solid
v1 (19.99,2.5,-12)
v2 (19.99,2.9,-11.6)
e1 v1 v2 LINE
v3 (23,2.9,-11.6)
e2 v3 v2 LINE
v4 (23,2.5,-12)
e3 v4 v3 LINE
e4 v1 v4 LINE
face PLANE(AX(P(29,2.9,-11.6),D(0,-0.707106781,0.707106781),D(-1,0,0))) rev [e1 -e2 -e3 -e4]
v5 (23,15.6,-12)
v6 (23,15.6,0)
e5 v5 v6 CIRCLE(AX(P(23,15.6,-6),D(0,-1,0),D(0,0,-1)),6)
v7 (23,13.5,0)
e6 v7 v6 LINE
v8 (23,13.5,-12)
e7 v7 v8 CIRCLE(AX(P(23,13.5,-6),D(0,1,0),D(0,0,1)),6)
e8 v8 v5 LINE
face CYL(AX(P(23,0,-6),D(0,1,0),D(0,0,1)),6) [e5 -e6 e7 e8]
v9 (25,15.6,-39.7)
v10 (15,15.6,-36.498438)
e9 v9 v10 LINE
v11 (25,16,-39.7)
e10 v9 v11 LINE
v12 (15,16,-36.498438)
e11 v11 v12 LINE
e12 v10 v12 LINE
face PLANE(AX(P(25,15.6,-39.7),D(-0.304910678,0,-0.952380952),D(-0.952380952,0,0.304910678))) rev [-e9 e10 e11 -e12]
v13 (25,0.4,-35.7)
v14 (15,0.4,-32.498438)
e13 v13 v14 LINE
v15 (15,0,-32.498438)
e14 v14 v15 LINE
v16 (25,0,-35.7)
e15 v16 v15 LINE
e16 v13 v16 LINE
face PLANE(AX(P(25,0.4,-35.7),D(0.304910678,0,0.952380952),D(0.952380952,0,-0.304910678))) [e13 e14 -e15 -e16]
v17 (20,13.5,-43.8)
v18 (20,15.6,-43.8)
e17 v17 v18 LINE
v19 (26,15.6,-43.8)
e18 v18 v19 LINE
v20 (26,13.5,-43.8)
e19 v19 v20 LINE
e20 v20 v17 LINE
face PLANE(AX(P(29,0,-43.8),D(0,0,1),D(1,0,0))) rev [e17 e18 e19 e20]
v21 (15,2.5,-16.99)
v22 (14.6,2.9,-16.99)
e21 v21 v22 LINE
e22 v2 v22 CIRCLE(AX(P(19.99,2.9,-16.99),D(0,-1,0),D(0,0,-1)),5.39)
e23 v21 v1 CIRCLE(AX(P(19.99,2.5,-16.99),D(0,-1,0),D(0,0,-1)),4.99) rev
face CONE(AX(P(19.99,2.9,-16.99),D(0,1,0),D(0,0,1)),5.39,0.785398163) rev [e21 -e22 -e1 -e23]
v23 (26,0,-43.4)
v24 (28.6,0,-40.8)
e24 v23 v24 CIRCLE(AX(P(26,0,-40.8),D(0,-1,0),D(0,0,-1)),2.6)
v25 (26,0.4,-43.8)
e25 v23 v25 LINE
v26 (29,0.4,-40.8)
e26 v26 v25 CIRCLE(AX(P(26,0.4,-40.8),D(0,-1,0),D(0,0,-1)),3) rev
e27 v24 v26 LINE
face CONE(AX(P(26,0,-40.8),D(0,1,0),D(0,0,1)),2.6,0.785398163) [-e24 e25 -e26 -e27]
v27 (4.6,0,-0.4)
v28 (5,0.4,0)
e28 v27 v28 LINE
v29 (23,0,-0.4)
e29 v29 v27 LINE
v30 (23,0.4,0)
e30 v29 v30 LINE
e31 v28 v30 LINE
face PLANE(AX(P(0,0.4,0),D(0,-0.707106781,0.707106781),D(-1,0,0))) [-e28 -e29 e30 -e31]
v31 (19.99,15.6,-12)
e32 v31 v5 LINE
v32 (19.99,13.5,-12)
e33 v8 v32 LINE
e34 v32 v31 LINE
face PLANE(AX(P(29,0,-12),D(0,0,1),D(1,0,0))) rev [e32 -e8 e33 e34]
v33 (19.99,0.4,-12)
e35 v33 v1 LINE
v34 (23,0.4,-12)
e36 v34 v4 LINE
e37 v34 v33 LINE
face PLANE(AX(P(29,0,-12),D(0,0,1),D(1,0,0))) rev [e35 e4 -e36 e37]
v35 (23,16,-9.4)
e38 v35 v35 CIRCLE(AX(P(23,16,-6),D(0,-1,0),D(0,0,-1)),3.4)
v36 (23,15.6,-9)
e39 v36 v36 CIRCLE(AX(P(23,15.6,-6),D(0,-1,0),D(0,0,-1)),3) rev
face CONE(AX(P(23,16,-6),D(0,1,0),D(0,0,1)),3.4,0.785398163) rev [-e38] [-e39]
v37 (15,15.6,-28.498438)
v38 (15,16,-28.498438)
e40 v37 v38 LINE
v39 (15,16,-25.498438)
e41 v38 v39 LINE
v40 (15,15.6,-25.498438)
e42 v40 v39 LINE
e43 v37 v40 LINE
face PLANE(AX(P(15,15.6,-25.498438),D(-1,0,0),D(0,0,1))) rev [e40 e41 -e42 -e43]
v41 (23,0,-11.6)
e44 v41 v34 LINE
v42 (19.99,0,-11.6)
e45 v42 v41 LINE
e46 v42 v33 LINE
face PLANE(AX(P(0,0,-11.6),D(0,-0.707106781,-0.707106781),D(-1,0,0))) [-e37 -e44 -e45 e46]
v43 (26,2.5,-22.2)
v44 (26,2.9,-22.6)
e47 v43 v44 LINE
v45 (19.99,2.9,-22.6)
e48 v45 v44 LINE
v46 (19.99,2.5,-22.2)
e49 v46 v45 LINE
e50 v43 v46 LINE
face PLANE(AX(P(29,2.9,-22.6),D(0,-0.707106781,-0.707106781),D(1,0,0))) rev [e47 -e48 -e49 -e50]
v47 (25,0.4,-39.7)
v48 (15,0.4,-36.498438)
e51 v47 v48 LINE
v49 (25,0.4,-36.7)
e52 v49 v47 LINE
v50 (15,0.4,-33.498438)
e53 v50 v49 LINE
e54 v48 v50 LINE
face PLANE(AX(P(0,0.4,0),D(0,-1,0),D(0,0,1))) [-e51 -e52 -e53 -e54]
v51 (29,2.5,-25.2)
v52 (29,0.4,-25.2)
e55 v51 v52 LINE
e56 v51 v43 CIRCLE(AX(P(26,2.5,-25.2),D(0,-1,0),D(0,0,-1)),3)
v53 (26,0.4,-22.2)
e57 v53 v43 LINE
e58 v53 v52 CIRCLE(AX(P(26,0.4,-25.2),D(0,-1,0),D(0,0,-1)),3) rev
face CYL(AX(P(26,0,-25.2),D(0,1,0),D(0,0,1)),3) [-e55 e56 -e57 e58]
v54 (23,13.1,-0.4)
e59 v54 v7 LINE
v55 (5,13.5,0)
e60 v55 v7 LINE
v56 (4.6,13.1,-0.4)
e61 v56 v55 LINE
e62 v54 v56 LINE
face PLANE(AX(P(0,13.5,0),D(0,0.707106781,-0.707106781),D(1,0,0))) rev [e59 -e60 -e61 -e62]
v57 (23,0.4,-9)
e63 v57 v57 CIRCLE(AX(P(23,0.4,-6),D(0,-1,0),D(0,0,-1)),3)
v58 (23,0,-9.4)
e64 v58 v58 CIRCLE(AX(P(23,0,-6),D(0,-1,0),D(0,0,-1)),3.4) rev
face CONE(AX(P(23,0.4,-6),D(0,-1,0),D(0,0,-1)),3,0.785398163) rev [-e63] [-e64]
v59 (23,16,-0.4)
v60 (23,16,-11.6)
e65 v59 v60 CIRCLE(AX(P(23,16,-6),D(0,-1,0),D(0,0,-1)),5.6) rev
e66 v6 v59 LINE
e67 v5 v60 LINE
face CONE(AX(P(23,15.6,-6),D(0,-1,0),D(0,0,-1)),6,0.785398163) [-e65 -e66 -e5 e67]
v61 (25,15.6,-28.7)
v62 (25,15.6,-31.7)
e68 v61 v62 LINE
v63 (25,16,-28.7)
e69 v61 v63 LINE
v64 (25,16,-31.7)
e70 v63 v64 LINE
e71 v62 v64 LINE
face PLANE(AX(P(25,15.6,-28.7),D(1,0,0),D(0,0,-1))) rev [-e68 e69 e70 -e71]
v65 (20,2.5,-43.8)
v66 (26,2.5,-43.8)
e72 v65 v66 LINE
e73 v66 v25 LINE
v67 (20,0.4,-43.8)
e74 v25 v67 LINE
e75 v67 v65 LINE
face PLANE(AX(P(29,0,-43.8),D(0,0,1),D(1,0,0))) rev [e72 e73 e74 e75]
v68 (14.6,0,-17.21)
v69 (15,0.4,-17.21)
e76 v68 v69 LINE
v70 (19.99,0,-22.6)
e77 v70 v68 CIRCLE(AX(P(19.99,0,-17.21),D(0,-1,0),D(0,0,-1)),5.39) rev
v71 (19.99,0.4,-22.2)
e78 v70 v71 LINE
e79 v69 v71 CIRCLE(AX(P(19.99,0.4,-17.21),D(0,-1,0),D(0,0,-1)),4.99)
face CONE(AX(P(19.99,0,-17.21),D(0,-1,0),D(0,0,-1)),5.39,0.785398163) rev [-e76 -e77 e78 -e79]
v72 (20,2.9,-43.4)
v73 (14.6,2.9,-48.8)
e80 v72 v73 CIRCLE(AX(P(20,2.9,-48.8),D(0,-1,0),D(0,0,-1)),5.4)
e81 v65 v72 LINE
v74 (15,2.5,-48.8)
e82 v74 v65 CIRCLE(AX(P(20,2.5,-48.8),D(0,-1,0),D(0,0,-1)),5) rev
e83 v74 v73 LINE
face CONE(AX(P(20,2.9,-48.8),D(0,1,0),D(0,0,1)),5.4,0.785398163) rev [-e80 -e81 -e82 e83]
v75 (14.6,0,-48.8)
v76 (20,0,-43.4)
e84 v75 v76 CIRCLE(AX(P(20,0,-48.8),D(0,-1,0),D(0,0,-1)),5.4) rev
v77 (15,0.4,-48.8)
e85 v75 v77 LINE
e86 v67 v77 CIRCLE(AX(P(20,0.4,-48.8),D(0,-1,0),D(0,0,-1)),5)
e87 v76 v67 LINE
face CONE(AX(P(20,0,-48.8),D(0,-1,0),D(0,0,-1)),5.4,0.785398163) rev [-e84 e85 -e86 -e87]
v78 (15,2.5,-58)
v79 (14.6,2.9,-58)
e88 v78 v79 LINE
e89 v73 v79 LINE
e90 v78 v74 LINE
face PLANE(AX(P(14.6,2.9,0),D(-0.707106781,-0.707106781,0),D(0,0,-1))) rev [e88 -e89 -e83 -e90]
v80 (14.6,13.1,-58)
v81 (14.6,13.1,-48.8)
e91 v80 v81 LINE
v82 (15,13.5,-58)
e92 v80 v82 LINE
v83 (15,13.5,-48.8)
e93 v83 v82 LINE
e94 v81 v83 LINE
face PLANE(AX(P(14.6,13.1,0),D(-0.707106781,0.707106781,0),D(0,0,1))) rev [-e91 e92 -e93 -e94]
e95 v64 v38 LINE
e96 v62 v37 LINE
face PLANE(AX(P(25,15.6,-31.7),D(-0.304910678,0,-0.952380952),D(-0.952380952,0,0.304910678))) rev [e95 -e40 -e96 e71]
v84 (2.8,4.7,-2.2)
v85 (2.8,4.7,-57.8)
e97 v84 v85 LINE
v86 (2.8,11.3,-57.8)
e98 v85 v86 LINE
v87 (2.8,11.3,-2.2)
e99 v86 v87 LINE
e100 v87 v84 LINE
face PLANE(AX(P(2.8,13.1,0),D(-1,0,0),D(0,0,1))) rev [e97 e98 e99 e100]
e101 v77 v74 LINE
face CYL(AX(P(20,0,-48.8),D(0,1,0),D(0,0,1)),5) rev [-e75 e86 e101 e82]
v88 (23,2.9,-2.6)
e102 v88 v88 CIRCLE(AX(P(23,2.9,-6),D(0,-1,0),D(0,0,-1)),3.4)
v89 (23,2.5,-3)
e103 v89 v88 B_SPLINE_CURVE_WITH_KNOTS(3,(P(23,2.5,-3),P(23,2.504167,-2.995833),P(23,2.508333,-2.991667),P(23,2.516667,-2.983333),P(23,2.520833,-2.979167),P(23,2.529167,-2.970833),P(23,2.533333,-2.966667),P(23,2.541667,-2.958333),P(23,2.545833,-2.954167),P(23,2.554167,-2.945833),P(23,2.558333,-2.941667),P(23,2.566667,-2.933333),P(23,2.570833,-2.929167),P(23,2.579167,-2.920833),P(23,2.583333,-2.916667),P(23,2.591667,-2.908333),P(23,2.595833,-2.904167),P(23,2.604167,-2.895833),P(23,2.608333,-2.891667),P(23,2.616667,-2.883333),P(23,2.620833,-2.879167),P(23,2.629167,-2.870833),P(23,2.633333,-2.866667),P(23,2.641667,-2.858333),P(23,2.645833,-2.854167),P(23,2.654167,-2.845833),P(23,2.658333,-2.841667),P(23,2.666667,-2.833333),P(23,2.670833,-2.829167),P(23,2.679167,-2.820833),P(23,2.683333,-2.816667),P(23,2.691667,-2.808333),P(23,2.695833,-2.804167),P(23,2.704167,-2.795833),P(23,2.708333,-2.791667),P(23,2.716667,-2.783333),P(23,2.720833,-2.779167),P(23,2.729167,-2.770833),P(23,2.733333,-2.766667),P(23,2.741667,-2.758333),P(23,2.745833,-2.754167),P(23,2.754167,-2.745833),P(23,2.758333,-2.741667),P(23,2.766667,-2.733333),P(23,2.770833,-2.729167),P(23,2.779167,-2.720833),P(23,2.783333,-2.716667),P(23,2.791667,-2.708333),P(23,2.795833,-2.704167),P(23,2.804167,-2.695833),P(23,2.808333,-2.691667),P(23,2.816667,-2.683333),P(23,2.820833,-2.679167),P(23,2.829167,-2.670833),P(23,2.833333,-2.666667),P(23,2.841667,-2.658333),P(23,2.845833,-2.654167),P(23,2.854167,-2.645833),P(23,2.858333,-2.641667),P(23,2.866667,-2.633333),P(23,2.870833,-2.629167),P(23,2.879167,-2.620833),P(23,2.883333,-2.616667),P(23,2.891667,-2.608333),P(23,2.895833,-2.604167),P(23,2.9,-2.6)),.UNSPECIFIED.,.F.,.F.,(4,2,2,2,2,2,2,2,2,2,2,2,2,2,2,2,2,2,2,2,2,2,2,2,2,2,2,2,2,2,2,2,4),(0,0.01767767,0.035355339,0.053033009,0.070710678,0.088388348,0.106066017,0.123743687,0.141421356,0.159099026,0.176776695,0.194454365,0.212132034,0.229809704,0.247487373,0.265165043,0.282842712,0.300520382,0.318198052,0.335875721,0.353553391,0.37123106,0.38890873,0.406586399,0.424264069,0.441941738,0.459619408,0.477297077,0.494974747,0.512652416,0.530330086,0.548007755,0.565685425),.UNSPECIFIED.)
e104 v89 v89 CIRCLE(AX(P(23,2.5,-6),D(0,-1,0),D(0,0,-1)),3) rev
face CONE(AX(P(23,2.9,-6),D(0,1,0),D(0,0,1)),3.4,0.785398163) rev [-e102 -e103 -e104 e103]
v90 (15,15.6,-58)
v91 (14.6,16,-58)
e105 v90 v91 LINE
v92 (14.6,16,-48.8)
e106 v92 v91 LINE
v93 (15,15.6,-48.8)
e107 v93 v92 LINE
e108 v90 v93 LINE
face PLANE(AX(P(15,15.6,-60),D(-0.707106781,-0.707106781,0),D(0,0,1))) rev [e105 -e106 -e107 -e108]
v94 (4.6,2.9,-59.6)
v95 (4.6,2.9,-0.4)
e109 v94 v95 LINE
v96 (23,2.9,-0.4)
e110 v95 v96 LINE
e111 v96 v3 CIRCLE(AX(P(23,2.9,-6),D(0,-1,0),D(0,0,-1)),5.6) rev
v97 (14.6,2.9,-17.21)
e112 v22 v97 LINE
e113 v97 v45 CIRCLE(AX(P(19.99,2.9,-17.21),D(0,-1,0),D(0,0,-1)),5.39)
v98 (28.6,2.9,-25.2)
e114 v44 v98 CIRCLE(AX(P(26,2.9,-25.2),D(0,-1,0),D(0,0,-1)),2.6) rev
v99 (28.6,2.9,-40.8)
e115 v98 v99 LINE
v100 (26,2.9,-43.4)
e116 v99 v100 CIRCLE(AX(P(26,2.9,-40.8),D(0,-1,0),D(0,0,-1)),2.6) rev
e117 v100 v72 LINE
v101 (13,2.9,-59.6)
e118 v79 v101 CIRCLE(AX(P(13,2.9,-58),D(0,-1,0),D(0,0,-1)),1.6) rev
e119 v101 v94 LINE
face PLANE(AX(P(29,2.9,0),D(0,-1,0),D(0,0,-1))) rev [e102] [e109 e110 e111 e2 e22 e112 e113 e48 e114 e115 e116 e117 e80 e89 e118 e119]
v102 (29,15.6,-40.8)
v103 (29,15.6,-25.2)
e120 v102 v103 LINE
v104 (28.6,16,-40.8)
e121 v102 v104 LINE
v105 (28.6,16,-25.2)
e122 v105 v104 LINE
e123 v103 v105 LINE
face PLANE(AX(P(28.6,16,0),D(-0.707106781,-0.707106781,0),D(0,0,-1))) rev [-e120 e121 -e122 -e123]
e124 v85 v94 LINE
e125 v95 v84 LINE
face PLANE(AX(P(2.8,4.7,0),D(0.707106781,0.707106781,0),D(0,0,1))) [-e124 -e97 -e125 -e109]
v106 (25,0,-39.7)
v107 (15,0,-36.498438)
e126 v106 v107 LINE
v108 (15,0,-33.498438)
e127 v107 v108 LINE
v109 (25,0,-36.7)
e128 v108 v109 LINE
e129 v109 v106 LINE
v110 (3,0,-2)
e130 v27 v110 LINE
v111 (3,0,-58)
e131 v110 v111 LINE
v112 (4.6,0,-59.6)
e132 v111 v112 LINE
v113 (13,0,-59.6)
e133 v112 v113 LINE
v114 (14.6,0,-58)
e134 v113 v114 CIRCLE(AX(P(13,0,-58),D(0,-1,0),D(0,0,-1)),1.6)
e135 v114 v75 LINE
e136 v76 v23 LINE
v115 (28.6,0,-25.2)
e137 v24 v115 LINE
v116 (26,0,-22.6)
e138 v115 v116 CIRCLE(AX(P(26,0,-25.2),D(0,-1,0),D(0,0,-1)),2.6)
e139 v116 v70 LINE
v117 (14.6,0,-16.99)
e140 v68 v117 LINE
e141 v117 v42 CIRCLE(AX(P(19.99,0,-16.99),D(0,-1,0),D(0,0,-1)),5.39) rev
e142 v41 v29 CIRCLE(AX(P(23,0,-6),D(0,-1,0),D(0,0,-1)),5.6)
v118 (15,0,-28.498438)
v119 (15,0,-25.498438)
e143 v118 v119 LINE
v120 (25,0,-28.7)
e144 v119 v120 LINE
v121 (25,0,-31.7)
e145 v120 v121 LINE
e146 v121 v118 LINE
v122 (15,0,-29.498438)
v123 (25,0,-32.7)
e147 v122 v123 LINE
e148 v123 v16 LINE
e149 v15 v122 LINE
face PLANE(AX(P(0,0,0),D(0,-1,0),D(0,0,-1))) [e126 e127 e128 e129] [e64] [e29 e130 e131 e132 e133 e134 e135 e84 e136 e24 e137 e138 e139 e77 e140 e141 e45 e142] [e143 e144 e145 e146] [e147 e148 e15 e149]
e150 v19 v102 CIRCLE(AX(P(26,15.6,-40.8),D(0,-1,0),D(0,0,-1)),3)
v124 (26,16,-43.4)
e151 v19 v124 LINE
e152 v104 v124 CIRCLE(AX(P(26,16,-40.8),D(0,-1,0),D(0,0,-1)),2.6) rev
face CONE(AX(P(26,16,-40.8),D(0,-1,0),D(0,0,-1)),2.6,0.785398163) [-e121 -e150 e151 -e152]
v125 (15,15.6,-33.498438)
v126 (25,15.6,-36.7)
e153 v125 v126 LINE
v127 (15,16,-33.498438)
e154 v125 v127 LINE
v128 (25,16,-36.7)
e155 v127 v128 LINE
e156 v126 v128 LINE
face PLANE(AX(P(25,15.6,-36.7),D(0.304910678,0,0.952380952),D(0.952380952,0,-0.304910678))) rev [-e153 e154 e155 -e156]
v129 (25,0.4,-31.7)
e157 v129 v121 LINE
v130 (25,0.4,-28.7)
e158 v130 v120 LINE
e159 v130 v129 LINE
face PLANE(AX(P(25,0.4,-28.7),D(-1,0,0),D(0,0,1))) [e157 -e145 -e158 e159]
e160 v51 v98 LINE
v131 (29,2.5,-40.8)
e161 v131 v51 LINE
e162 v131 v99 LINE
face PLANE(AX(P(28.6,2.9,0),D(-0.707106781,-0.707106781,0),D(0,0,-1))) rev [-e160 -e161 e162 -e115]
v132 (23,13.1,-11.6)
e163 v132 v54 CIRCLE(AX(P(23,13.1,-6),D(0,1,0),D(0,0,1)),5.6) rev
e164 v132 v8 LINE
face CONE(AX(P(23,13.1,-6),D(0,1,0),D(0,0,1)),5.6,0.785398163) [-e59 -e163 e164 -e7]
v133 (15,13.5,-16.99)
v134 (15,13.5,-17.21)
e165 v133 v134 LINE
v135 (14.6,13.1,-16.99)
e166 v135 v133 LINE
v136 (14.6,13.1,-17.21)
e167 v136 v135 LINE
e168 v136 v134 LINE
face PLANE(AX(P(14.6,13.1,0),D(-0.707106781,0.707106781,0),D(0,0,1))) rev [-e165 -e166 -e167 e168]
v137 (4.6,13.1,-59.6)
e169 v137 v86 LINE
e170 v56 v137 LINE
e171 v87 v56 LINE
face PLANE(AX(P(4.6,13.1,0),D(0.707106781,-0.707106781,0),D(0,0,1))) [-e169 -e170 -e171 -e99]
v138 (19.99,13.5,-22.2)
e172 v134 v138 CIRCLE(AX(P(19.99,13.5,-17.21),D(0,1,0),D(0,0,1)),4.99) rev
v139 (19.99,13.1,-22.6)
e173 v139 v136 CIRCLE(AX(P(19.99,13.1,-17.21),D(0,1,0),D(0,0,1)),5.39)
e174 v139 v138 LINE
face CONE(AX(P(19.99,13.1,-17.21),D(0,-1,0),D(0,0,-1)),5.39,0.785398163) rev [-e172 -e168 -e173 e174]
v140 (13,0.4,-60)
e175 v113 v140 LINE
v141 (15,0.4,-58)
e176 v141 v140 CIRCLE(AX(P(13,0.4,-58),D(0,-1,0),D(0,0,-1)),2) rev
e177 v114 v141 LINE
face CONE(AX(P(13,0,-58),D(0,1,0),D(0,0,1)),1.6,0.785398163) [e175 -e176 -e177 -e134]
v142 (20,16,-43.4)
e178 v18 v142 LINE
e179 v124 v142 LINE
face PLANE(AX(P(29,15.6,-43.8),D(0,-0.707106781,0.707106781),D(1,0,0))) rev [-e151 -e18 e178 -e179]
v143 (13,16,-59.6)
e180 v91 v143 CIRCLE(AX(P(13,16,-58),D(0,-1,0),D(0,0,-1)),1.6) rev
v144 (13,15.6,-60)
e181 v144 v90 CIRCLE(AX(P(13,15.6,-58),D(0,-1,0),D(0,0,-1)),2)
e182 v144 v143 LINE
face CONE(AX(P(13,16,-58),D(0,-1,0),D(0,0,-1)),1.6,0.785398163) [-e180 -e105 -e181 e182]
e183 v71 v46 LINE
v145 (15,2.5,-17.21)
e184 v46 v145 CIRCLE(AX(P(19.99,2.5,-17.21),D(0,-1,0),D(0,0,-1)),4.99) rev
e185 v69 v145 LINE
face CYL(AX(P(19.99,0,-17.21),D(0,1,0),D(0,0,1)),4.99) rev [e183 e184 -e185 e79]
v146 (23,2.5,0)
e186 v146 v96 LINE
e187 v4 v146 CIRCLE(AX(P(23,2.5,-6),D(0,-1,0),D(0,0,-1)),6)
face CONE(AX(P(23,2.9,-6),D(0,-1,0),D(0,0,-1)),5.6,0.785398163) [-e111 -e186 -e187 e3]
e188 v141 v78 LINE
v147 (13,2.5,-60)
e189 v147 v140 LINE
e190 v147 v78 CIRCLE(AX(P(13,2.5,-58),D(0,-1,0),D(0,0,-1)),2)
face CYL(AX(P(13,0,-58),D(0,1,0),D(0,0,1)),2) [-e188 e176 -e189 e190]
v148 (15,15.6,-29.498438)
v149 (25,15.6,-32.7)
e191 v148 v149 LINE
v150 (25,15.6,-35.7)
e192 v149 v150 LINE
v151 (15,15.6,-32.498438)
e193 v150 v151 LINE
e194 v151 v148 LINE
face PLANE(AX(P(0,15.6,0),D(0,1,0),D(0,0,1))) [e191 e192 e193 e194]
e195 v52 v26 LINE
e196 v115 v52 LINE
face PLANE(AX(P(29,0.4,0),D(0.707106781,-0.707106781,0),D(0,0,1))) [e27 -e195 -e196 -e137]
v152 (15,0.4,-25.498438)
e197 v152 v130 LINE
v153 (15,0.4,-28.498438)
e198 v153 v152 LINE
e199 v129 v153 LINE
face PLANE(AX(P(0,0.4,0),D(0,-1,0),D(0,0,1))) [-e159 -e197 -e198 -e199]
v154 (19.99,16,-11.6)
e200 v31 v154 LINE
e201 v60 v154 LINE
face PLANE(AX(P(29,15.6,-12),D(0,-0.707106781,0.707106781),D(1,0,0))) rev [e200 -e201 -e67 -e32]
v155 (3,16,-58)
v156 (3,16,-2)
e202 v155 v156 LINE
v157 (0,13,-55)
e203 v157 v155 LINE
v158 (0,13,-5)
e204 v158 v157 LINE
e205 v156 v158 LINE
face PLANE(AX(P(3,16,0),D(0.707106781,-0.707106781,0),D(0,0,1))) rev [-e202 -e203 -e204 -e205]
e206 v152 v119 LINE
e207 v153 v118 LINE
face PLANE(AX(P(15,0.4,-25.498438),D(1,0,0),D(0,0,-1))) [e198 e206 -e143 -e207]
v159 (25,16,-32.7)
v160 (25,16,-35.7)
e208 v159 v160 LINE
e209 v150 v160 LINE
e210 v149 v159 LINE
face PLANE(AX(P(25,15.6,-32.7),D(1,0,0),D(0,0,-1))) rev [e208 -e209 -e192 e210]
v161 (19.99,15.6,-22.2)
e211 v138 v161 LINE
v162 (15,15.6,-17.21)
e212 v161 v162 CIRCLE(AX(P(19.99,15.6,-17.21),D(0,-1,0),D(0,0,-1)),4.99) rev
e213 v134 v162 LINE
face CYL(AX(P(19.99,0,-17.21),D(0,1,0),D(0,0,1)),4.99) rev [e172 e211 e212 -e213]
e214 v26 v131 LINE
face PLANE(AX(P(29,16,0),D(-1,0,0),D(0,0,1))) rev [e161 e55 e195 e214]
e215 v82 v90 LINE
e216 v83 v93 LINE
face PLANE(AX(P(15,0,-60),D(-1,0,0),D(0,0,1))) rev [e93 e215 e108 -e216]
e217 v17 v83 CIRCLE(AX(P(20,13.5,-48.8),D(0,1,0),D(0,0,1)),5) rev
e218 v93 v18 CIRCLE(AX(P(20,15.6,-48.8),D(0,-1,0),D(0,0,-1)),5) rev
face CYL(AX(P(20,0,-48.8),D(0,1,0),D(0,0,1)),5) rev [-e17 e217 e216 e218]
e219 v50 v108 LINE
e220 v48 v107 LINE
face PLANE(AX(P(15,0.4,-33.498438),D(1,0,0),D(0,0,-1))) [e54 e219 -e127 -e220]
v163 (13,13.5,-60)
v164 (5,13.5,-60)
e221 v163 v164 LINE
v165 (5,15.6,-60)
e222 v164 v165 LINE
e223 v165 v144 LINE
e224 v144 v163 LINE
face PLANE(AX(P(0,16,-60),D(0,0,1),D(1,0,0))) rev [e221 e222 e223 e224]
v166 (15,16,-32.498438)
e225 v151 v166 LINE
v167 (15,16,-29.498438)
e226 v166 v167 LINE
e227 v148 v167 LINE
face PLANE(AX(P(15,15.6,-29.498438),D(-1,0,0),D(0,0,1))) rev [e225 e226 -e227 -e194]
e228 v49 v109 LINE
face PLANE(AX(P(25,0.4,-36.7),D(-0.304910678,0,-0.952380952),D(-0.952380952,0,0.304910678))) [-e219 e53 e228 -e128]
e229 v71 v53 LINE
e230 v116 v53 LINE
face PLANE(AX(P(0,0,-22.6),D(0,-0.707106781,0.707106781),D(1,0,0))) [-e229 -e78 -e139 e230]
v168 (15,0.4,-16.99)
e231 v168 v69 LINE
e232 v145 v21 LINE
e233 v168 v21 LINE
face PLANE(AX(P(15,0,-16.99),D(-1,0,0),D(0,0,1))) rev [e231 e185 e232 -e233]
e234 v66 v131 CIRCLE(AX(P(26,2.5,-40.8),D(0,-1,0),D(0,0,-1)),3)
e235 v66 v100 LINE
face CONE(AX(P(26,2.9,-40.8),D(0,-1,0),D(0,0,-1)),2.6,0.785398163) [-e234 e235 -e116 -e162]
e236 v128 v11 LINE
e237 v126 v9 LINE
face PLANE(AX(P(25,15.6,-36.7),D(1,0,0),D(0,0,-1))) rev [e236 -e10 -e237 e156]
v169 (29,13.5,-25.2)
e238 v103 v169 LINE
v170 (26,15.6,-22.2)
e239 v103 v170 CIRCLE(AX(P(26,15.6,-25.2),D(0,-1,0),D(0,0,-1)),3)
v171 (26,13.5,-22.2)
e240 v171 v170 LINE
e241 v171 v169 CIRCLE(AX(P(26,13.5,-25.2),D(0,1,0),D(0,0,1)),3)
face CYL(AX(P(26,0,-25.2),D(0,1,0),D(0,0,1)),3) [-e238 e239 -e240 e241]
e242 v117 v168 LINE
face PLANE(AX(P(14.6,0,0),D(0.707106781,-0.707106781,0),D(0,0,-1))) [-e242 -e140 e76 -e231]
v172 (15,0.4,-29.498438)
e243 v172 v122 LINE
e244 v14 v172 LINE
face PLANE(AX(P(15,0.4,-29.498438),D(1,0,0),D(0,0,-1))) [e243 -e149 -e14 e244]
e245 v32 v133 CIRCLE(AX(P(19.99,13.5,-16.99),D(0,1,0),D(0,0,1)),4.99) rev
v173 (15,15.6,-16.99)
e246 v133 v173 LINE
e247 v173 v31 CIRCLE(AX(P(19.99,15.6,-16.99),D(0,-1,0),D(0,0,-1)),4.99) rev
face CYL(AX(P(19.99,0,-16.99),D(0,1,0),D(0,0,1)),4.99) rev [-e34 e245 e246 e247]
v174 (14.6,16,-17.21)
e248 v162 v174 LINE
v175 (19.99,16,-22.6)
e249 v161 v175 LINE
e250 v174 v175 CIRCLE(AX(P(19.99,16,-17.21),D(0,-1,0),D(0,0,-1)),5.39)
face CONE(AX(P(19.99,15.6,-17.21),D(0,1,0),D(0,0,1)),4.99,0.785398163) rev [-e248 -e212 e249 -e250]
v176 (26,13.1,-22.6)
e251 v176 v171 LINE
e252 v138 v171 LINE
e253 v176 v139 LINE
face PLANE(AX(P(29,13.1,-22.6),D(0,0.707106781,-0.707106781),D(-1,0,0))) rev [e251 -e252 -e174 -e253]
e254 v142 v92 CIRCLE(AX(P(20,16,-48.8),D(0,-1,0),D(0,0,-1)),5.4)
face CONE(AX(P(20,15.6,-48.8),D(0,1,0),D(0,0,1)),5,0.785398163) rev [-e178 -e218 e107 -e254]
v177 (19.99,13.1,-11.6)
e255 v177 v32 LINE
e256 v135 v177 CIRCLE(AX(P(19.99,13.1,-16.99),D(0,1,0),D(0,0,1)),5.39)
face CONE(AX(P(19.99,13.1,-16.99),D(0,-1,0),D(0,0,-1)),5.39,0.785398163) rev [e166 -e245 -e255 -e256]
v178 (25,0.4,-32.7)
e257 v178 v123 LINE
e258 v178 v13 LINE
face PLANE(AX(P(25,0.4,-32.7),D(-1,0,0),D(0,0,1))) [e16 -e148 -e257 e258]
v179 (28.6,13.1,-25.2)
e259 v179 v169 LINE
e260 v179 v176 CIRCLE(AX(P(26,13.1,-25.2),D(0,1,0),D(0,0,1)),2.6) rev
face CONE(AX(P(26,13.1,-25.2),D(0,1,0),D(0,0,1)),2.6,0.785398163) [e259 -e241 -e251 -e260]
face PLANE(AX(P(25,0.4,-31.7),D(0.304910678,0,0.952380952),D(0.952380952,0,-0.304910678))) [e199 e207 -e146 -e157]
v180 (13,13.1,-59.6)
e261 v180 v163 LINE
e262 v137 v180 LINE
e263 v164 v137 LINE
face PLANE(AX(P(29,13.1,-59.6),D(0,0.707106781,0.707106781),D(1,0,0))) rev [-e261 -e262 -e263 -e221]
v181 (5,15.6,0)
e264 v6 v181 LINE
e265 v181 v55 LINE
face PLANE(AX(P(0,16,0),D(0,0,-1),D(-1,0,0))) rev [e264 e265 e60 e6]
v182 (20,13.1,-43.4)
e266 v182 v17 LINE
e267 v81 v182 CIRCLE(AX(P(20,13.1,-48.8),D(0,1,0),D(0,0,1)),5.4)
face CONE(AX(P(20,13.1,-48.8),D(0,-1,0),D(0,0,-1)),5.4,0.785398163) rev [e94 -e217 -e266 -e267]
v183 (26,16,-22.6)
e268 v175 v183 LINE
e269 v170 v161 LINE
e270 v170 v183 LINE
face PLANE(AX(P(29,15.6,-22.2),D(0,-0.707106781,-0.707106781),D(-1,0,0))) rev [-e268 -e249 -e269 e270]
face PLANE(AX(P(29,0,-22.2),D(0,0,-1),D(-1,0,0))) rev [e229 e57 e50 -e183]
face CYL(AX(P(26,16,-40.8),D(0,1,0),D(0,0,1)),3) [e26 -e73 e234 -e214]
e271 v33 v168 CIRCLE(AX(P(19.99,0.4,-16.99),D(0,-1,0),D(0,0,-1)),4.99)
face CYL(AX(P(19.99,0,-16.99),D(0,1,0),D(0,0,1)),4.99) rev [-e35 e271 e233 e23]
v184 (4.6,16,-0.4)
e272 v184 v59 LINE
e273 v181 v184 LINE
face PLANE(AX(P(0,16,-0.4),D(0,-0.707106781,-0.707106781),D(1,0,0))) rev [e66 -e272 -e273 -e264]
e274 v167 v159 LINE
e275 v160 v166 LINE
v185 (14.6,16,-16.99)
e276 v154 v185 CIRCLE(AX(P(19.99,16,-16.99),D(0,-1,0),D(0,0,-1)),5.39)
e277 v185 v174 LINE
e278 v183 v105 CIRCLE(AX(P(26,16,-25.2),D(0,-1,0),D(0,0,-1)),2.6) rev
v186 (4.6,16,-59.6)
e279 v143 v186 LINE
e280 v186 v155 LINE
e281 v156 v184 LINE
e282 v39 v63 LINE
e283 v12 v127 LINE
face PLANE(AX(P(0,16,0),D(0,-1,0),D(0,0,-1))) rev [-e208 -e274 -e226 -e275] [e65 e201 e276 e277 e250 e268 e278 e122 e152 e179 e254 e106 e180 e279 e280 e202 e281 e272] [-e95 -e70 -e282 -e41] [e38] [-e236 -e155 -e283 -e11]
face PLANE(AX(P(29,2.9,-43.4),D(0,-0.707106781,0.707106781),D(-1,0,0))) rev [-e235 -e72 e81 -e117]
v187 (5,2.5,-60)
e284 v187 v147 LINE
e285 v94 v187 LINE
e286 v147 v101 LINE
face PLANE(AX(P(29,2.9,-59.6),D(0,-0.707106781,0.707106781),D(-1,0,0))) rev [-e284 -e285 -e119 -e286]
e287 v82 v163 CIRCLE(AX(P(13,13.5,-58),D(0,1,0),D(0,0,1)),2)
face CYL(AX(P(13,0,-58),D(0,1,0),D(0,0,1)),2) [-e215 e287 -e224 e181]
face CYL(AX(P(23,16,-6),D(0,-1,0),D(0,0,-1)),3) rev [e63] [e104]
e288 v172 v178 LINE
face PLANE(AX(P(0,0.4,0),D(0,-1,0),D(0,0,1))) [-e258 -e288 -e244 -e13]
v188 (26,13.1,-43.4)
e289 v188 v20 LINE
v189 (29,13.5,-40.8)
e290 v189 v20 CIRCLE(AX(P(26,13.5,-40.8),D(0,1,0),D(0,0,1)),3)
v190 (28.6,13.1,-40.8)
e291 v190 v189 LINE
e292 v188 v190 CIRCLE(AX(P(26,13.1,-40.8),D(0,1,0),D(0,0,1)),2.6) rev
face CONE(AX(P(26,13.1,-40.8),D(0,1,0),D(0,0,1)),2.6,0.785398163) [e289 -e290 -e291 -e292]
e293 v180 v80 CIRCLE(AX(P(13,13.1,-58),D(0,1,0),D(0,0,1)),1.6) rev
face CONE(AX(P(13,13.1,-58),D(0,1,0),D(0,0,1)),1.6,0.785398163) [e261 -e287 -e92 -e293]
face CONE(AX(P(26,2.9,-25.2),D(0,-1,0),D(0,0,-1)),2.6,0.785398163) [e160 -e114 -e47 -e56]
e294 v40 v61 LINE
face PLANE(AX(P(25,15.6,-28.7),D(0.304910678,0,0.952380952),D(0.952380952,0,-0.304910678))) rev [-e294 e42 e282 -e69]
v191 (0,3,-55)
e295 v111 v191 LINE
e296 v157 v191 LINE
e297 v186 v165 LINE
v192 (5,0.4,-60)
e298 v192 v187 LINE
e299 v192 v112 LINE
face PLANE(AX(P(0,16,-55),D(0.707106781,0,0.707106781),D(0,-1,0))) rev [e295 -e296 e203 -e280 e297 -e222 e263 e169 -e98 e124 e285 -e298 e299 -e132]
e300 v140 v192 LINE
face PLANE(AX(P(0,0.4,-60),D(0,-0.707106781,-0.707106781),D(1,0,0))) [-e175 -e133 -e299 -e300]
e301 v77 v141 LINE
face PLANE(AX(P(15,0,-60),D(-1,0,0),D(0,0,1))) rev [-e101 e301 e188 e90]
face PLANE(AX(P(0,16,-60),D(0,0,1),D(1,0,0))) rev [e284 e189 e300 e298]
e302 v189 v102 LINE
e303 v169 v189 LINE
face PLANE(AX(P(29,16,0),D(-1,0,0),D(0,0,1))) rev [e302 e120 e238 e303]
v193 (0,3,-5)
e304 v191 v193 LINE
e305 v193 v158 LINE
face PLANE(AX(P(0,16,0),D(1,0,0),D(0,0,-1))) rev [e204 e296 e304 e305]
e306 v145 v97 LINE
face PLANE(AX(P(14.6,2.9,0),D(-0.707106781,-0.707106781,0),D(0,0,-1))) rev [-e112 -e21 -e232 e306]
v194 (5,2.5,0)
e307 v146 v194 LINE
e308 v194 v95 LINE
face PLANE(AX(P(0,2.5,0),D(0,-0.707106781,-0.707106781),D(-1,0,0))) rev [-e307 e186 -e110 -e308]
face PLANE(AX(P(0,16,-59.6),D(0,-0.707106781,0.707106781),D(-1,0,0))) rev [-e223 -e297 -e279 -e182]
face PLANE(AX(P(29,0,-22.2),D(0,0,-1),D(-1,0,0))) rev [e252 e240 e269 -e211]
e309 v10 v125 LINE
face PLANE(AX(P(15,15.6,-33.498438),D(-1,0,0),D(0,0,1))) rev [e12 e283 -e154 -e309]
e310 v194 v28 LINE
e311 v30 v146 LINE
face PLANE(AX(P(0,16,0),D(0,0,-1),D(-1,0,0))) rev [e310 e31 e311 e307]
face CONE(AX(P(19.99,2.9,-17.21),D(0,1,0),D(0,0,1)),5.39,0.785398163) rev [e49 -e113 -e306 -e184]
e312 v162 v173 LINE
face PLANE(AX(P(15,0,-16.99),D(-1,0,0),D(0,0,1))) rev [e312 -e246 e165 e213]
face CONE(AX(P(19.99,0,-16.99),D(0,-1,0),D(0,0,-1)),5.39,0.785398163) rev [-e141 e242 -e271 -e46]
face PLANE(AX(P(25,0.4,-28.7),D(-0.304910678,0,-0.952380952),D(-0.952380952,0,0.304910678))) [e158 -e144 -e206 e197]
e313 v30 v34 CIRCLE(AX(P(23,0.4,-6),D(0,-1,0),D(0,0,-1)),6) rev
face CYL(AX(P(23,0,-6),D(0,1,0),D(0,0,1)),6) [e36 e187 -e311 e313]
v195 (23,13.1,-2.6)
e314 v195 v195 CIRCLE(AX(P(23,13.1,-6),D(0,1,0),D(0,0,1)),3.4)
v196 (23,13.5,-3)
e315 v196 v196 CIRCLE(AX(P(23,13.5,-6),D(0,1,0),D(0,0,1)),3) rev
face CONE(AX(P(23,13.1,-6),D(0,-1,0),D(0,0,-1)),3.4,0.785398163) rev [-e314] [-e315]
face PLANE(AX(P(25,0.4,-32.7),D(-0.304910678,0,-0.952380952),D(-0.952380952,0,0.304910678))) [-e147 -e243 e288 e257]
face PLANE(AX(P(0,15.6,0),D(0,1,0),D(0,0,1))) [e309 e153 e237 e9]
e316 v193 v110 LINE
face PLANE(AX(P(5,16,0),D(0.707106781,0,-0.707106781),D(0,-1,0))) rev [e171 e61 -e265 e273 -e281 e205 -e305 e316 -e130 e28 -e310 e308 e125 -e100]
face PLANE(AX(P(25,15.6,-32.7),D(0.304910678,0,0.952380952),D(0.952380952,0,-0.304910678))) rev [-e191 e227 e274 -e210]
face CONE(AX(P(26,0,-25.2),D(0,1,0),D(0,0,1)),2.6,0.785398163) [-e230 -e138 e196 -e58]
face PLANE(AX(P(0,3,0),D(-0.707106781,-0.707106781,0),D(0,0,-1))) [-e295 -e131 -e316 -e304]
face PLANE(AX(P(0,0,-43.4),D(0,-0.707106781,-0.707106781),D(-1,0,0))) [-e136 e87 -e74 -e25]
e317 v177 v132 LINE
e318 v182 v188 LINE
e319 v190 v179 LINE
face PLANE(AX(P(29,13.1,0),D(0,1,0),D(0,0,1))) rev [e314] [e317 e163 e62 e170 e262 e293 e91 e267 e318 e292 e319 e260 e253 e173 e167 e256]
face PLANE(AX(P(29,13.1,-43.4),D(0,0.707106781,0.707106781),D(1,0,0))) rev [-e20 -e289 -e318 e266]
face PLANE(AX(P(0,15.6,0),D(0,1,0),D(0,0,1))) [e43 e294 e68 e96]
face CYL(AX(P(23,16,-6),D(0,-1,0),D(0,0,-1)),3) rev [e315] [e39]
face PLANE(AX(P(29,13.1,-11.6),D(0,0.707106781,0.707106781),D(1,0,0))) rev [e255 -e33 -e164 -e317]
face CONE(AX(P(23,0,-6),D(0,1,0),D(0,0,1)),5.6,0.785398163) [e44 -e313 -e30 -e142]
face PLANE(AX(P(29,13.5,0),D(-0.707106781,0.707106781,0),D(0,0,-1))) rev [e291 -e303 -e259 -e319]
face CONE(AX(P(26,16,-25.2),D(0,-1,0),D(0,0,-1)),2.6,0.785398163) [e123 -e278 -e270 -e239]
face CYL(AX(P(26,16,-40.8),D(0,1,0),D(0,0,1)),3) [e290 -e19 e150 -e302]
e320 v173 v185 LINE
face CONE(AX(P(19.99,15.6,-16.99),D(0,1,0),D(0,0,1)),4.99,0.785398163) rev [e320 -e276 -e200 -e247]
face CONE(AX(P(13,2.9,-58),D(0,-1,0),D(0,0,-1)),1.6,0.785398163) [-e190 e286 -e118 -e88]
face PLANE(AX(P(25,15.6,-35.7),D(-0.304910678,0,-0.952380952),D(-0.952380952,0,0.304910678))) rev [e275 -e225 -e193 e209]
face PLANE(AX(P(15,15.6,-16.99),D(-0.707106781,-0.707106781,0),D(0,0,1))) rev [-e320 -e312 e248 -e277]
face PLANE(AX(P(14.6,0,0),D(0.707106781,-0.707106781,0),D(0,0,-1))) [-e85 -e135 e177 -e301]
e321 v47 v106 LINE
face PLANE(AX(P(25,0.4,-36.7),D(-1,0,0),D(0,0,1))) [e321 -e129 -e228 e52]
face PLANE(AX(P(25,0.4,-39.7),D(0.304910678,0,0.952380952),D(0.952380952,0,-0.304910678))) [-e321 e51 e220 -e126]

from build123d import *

# Parameters (mm, degrees)
SKETCH_1_W          = 29
SKETCH_1_H          = 60
EXTRUDE_1_DEPTH     = 16
SKETCH_2_W          = 26.2
SKETCH_2_H          = 10.2
CUT_EXTRUDE_1_DEPTH = 69.534662763
SKETCH_3_R          = 3
CUT_EXTRUDE_2_DEPTH = 69.534662763
CUT_EXTRUDE_3_DEPTH = 69.534662763
CUT_EXTRUDE_4_DEPTH = 69.534662763
CUT_EXTRUDE_5_DEPTH = 69.534662763
FILLET_1_R          = 3
CHAMFER_1_SIZE      = 5
CHAMFER_3_SIZE      = 3
CHAMFER_4_SIZE      = 1.8
FILLET_2_R          = 2
CHAMFER_2_SIZE      = 0.4
CUT_EXTRUDE_6_DEPTH = 0.4


with BuildPart() as part:
    # 草图1 → 凸台-拉伸1 (new body)
    with BuildSketch(Plane(origin=(0, 0, 0), x_dir=(1, 0, 0), z_dir=(0, 1, 0))):
        with Locations((14.5, 30)):
            Rectangle(SKETCH_1_W, SKETCH_1_H)
    extrude(amount=EXTRUDE_1_DEPTH)

    # 草图2 → 切除-拉伸1 (cut, through all)
    with BuildSketch(Plane(origin=(0, 0, -60), x_dir=(-1, 0, 0), z_dir=(0, 0, -1))):
        with Locations((-15.9, 8)):
            Rectangle(SKETCH_2_W, SKETCH_2_H)
    extrude(amount=-CUT_EXTRUDE_1_DEPTH, mode=Mode.SUBTRACT)

    # 草图3 → 切除-拉伸2 (cut, through all)
    with BuildSketch(Plane(origin=(0, 0, 0), x_dir=(-1, 0, 0), z_dir=(0, -1, 0))):
        with Locations(Location((-23, 6, 0), (0, 0, 90))):
            Circle(SKETCH_3_R)
    extrude(amount=-CUT_EXTRUDE_2_DEPTH, mode=Mode.SUBTRACT)

    # 草图4 → 切除-拉伸3 (cut, through all)
    with BuildSketch(Plane(origin=(0, 16, 0), x_dir=(1, 0, 0), z_dir=(0, 1, 0))):
        with BuildLine():
            Line((23, 0), (24.972936344, -1.282691022))
            Line((24.972936344, -1.282691022), (32.744307438, -1.586182692))
            Line((32.744307438, -1.586182692), (32.104431406, 9.686424342))
            Line((32.104431406, 9.686424342), (29.958145659, 12))
            Line((29.958145659, 12), (23, 12))
            ThreePointArc((23, 12), (29, 6), (23, 0))
        make_face()
    extrude(amount=-CUT_EXTRUDE_3_DEPTH, mode=Mode.SUBTRACT)

    # 草图5 → 切除-拉伸4 (cut, through all)
    with BuildSketch(Plane(origin=(0, 16, 0), x_dir=(1, 0, 0), z_dir=(0, 1, 0))):
        with BuildLine():
            Line((29, 12), (19.99, 12))
            ThreePointArc((19.99, 12), (16.461537162, 13.461537162), (15, 16.99))
            Line((15, 16.99), (15, 17.21))
            ThreePointArc((15, 17.21), (16.461537162, 20.738462838), (19.99, 22.2))
            Line((19.99, 22.2), (29, 22.2))
            Line((29, 22.2), (29, 12))
        make_face()
    extrude(amount=-CUT_EXTRUDE_4_DEPTH, mode=Mode.SUBTRACT)

    # 草图6 → 切除-拉伸5 (cut, through all)
    with BuildSketch(Plane(origin=(0, 16, 0), x_dir=(1, 0, 0), z_dir=(0, 1, 0))):
        with BuildLine():
            Line((29, 60), (15, 60))
            Line((15, 60), (15, 48.8))
            ThreePointArc((15, 48.8), (16.464466094, 45.264466094), (20, 43.8))
            Line((20, 43.8), (29, 43.8))
            Line((29, 43.8), (29, 60))
        make_face()
    extrude(amount=-CUT_EXTRUDE_5_DEPTH, mode=Mode.SUBTRACT)

    # 圆角1
    fillet_1_edges = [part.edges().sort_by_distance(p)[0] for p in [
        (29, 14.55, -43.8),
        (29, 1.45, -43.8),
        (29, 14.55, -22.2),
        (29, 1.45, -22.2),
    ]]
    fillet(fillet_1_edges, radius=FILLET_1_R)

    # 倒角1
    # the kernel refuses this chamfer: 5 mm, written as the material it takes off along each edge
    with BuildSketch(Plane(origin=(0, -12.85841494, -60), x_dir=(0.9996219169112968, 0, -0.027495876610586317), z_dir=(0, 1, 0)), Plane(origin=(0, -12.85841494, 0), x_dir=(-0.027495876610586372, 0, -0.9996219169112968), z_dir=(0, 1, 0))) as chamfer_1_piece_1:
        Polygon((CHAMFER_1_SIZE * 0.999621916911, -CHAMFER_1_SIZE * 0.0274958766106), (-CHAMFER_1_SIZE * 0.0274958766106, -CHAMFER_1_SIZE * 0.999621916911), (0, 0), align=None)
    extrude(amount=41.71682988, mode=Mode.SUBTRACT)

    # 倒角3
    chamfer_3_edges = [part.edges().sort_by_distance(p)[0] for p in [
        (0, 0, -30),
        (0, 16, -30),
    ]]
    chamfer(chamfer_3_edges, length=CHAMFER_3_SIZE)

    # 倒角4
    chamfer_4_edges = [part.edges().sort_by_distance(p)[0] for p in [
        (2.8, 13.1, -30),
        (2.8, 2.9, -30),
    ]]
    chamfer(chamfer_4_edges, length=CHAMFER_4_SIZE)

    # 圆角2
    fillet_2_edges = [part.edges().sort_by_distance(p)[0] for p in [
        (15, 14.55, -60),
        (15, 1.45, -60),
    ]]
    fillet(fillet_2_edges, radius=FILLET_2_R)

    # 倒角2
    chamfer_2_edges = [part.edges().sort_by_distance(p)[0] for p in [
        (23, 0, -3),
        (29, 0, -6),
        (21.495, 0, -12),
        (16.461537162, 0, -13.461537162),
        (15, 0, -17.1),
        (16.461537162, 0, -20.738462838),
        (22.995, 0, -22.2),
        (28.121320344, 0, -23.078679656),
        (29, 0, -33),
        (28.121320344, 0, -42.921320344),
        (23, 0, -43.8),
        (16.464466094, 0, -45.264466094),
        (15, 0, -53.4),
        (9, 0, -60),
        (14, 0, 0),
        (29, 13.1, -6),
        (21.495, 13.1, -12),
        (16.461537162, 13.1, -13.461537162),
        (15, 13.1, -17.1),
        (16.461537162, 13.1, -20.738462838),
        (22.995, 13.1, -22.2),
        (28.121320344, 13.1, -23.078679656),
        (29, 13.1, -33),
        (28.121320344, 13.1, -42.921320344),
        (23, 13.1, -43.8),
        (16.464466094, 13.1, -45.264466094),
        (15, 13.1, -53.4),
        (9, 13.1, -60),
        (14, 13.1, 0),
        (23, 13.1, -3),
        (9, 2.9, -60),
        (15, 2.9, -53.4),
        (16.464466094, 2.9, -45.264466094),
        (23, 2.9, -43.8),
        (28.121320344, 2.9, -42.921320344),
        (29, 2.9, -33),
        (28.121320344, 2.9, -23.078679656),
        (22.995, 2.9, -22.2),
        (16.461537162, 2.9, -20.738462838),
        (15, 2.9, -17.1),
        (16.461537162, 2.9, -13.461537162),
        (21.495, 2.9, -12),
        (29, 2.9, -6),
        (14, 2.9, 0),
        (23, 2.9, -3),
        (9, 16, -60),
        (15, 16, -53.4),
        (16.464466094, 16, -45.264466094),
        (23, 16, -43.8),
        (28.121320344, 16, -42.921320344),
        (29, 16, -33),
        (28.121320344, 16, -23.078679656),
        (22.995, 16, -22.2),
        (16.461537162, 16, -20.738462838),
        (15, 16, -17.1),
        (16.461537162, 16, -13.461537162),
        (21.495, 16, -12),
        (29, 16, -6),
        (14, 16, 0),
        (23, 16, -3),
        (14.414213562, 0, -59.414213562),
        (14.414213562, 13.1, -59.414213562),
        (14.414213562, 2.9, -59.414213562),
        (14.414213562, 16, -59.414213562),
    ]]
    chamfer(chamfer_2_edges, length=CHAMFER_2_SIZE)

    # 草图7 → 切除-拉伸6 (cut)
    with BuildSketch(Plane(origin=(0, 16, 0), x_dir=(1, 0, 0), z_dir=(0, 1, 0))):
        Polygon((25, 28.7), (15, 25.498437881), (15, 28.498437881), (25, 31.7), align=None)
        Polygon((25, 32.7), (15, 29.498437881), (15, 32.498437881), (25, 35.7), align=None)
        Polygon((25, 36.7), (15, 33.498437881), (15, 36.498437881), (25, 39.7), align=None)
    cut_extrude_6 = extrude(amount=-CUT_EXTRUDE_6_DEPTH, mode=Mode.SUBTRACT)

    # 镜向1: 切除-拉伸6 across plane
    add(cut_extrude_6.mirror(Plane.ZX.offset(8)), mode=Mode.SUBTRACT)


solid = part.part
